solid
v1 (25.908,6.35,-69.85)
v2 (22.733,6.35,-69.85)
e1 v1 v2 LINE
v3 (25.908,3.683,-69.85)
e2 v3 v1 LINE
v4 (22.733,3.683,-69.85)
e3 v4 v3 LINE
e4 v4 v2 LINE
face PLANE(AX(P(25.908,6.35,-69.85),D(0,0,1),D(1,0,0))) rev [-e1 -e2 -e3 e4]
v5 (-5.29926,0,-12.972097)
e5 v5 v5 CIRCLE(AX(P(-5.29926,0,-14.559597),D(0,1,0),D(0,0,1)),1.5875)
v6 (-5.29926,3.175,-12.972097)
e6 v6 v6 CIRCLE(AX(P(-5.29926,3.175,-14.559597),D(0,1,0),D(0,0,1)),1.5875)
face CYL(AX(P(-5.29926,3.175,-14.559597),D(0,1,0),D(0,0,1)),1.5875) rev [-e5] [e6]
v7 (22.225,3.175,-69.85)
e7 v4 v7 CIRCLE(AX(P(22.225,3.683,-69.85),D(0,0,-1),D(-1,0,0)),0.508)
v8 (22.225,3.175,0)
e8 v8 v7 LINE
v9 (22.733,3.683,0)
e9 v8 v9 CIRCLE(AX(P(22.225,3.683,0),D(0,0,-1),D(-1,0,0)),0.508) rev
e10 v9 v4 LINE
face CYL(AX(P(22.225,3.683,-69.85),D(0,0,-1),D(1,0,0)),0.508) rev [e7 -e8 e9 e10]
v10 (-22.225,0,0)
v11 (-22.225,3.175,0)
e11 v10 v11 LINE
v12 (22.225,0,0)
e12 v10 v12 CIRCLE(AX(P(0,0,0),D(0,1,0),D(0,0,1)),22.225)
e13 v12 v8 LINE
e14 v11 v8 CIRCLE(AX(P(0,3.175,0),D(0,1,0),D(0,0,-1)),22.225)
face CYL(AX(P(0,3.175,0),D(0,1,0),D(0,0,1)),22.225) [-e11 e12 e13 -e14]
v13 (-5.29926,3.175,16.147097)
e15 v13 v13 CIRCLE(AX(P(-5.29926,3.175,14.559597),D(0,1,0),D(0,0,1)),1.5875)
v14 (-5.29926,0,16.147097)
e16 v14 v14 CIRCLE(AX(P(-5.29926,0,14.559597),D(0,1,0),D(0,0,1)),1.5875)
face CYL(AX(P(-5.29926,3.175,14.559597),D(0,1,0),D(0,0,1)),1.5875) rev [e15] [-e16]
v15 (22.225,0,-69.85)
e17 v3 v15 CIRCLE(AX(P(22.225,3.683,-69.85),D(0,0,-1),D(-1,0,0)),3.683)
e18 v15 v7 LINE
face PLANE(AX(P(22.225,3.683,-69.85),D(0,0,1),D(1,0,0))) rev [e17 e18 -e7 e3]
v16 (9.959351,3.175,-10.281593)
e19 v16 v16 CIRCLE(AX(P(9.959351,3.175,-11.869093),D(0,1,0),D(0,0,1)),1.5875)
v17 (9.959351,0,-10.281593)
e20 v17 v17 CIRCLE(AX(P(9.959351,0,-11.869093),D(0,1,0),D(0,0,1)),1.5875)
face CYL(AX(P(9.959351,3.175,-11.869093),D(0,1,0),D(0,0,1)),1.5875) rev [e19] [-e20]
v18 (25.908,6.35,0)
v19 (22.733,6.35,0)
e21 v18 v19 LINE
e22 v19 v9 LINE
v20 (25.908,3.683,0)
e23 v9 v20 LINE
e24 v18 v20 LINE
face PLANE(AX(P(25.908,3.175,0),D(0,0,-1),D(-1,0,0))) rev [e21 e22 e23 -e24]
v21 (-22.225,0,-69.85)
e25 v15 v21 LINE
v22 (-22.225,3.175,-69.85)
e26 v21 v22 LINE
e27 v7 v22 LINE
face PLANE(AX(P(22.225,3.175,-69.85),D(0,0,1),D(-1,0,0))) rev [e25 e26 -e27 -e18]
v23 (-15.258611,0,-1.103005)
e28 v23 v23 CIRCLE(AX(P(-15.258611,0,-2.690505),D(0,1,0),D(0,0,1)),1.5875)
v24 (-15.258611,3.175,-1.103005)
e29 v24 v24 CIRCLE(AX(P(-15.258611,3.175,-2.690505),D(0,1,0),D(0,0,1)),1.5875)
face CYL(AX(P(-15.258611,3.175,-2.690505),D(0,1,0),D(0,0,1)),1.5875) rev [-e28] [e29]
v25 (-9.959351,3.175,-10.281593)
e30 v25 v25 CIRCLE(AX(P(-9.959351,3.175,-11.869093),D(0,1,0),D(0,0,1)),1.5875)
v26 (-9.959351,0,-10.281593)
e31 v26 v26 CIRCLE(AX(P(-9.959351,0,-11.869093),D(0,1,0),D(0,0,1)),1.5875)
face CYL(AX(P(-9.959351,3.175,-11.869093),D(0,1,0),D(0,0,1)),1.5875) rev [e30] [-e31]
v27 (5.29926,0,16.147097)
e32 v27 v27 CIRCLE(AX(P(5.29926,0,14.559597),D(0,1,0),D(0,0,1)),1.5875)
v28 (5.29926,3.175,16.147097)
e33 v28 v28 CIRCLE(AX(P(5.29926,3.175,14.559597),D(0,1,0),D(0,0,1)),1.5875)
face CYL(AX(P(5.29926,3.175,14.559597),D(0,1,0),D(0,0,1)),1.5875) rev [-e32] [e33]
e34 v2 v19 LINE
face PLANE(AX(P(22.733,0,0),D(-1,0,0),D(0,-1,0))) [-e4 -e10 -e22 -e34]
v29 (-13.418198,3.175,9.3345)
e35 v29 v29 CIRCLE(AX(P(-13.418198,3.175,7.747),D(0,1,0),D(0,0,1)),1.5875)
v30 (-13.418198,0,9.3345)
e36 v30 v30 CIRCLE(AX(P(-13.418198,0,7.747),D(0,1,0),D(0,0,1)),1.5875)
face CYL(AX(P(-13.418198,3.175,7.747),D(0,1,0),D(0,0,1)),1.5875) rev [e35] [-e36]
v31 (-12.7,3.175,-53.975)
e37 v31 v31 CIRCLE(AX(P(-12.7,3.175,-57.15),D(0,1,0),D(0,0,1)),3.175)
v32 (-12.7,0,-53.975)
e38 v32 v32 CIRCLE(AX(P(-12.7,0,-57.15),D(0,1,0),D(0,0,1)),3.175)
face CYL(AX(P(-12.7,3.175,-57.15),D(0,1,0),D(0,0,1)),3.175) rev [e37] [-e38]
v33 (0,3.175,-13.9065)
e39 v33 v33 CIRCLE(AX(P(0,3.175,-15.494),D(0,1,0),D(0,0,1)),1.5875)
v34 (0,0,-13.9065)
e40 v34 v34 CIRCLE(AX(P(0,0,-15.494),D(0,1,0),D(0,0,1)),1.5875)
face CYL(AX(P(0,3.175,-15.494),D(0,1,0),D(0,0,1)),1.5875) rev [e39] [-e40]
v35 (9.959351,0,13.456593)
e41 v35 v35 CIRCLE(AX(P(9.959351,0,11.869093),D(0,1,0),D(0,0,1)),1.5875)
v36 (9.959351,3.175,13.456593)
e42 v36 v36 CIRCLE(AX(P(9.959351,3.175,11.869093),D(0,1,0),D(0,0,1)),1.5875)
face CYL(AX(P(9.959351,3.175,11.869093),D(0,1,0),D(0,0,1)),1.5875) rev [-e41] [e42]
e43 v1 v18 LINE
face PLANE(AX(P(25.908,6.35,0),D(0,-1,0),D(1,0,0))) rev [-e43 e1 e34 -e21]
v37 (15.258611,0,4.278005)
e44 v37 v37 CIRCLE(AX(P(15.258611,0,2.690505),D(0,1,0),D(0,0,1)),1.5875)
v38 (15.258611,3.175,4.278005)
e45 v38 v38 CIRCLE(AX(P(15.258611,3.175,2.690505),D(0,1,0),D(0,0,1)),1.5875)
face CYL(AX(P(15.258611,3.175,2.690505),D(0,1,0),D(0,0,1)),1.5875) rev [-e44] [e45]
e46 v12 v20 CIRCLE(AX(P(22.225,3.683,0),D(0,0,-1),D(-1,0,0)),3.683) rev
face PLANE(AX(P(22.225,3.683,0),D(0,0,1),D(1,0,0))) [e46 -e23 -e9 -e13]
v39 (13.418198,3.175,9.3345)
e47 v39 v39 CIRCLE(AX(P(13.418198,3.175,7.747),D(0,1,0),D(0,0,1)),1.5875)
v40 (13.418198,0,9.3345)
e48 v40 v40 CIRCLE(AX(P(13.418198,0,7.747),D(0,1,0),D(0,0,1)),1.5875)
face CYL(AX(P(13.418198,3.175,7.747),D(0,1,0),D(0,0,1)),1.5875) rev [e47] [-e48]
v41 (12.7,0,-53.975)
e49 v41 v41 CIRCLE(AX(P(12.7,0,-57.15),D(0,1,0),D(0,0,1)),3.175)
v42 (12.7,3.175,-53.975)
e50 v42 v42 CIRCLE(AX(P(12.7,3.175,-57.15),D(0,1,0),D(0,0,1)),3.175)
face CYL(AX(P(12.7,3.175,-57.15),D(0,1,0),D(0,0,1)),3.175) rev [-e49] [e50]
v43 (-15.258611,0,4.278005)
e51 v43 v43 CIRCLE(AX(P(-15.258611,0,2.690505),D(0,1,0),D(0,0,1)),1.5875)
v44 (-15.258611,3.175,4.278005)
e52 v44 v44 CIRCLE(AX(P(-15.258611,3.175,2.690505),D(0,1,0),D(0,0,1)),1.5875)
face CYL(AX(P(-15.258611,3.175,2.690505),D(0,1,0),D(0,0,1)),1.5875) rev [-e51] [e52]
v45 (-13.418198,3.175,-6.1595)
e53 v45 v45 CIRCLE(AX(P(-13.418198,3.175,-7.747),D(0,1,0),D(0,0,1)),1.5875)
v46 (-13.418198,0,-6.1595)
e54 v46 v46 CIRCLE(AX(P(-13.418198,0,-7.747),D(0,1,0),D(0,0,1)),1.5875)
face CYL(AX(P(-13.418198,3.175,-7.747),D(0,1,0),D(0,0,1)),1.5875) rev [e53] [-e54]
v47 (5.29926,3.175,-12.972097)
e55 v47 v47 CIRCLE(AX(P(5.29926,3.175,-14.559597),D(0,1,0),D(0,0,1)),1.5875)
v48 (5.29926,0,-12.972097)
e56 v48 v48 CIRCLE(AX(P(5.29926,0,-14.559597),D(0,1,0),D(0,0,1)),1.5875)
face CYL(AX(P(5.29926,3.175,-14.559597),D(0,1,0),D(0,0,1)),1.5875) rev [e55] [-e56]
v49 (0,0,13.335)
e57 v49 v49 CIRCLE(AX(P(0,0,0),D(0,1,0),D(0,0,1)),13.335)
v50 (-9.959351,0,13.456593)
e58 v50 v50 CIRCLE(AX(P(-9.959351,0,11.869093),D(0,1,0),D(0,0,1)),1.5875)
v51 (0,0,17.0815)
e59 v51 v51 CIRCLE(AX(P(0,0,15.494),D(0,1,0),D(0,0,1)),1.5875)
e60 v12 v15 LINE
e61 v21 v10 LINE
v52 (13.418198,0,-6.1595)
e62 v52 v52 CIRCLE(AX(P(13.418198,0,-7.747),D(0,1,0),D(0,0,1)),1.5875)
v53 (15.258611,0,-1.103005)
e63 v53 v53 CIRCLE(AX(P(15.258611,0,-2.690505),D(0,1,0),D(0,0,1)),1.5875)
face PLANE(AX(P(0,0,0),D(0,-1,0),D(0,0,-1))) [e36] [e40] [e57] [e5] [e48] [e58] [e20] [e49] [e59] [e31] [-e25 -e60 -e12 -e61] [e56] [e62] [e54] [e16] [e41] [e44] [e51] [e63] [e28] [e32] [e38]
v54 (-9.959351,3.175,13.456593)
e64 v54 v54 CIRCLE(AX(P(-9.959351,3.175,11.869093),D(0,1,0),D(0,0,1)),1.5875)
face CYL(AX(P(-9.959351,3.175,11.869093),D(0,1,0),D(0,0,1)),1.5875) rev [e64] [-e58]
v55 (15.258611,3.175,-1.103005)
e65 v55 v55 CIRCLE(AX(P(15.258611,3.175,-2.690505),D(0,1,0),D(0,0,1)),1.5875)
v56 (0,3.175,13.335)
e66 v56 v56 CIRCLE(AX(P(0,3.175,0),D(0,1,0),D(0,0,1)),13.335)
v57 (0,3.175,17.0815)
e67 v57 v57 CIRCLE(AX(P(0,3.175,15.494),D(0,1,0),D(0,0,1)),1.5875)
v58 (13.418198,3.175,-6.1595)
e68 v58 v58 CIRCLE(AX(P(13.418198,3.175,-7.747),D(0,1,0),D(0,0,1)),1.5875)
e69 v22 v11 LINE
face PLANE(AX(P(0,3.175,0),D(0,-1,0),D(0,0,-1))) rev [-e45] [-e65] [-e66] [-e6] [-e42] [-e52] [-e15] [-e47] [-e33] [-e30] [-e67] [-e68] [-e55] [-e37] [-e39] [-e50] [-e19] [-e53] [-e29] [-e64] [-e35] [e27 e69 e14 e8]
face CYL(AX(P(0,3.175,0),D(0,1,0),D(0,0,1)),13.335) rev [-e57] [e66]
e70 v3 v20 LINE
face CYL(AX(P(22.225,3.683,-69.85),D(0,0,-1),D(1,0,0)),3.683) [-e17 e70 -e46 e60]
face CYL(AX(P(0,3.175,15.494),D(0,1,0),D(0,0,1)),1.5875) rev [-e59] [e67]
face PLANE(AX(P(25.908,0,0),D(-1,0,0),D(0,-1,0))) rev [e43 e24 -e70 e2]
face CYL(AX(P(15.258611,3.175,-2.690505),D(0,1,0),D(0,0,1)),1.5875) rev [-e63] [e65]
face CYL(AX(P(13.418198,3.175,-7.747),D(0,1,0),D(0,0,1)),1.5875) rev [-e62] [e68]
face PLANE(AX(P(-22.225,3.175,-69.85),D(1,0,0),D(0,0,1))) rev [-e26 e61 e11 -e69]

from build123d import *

# Parameters (mm, degrees)
SKETCH1_R           = 13.335
BOSS_EXTRUDE1_DEPTH = 3.175
SKETCH2_R           = 3.175
SKETCH2_R_2         = 1.5875
CUT_EXTRUDE1_DEPTH  = 74.369297053
EDGE_FLANGE2_DEPTH  = 69.85


# Sheet-metal steps are written as plain solids
with BuildPart() as part:
    # Sketch1 → Boss-Extrude1 (new body)
    with BuildSketch(Plane(origin=(0, 0, 0), x_dir=(1, 0, 0), z_dir=(0, 1, 0))):
        with BuildLine():
            Line((22.225, 0), (22.225, 69.85))
            Line((22.225, 69.85), (-22.225, 69.85))
            Line((-22.225, 69.85), (-22.225, 0))
            ThreePointArc((-22.225, 0), (0, -22.225), (22.225, 0))
        make_face()
        with Locations(Location((0, 0, 0), (0, 0, 270))):
            Circle(SKETCH1_R, mode=Mode.SUBTRACT)
    extrude(amount=BOSS_EXTRUDE1_DEPTH)

    # Sketch2 → Cut-Extrude1 (cut, through all)
    with BuildSketch(Plane(origin=(0, 3.175, 0), x_dir=(1, 0, 0), z_dir=(0, 1, 0))):
        with Locations(Location((-12.7, 57.15, 0), (0, 0, 270))):
            Circle(SKETCH2_R)
        with Locations(Location((12.7, 57.15, 0), (0, 0, 270))):
            Circle(SKETCH2_R)
        with Locations(Location((0, 15.494, 0), (0, 0, 270))):
            Circle(SKETCH2_R_2)
        with Locations(Location((5.299260101, 14.559597466, 0), (0, 0, 270))):
            Circle(SKETCH2_R_2)
        with Locations(Location((9.959351224, 11.869092602, 0), (0, 0, 270))):
            Circle(SKETCH2_R_2)
        with Locations(Location((13.418197606, 7.747, 0), (0, 0, 270))):
            Circle(SKETCH2_R_2)
        with Locations(Location((15.258611325, 2.690504865, 0), (0, 0, 270))):
            Circle(SKETCH2_R_2)
        with Locations(Location((15.258611325, -2.690504865, 0), (0, 0, 270))):
            Circle(SKETCH2_R_2)
        with Locations(Location((13.418197606, -7.747, 0), (0, 0, 270))):
            Circle(SKETCH2_R_2)
        with Locations(Location((9.959351224, -11.869092602, 0), (0, 0, 270))):
            Circle(SKETCH2_R_2)
        with Locations(Location((5.299260101, -14.559597466, 0), (0, 0, 270))):
            Circle(SKETCH2_R_2)
        with Locations(Location((0, -15.494, 0), (0, 0, 270))):
            Circle(SKETCH2_R_2)
        with Locations(Location((-5.299260101, -14.559597466, 0), (0, 0, 270))):
            Circle(SKETCH2_R_2)
        with Locations(Location((-9.959351224, -11.869092602, 0), (0, 0, 270))):
            Circle(SKETCH2_R_2)
        with Locations(Location((-13.418197606, -7.747, 0), (0, 0, 270))):
            Circle(SKETCH2_R_2)
        with Locations(Location((-15.258611325, -2.690504865, 0), (0, 0, 270))):
            Circle(SKETCH2_R_2)
        with Locations(Location((-15.258611325, 2.690504865, 0), (0, 0, 270))):
            Circle(SKETCH2_R_2)
        with Locations(Location((-13.418197606, 7.747, 0), (0, 0, 270))):
            Circle(SKETCH2_R_2)
        with Locations(Location((-9.959351224, 11.869092602, 0), (0, 0, 270))):
            Circle(SKETCH2_R_2)
        with Locations(Location((-5.299260101, 14.559597466, 0), (0, 0, 270))):
            Circle(SKETCH2_R_2)
    extrude(amount=-CUT_EXTRUDE1_DEPTH, mode=Mode.SUBTRACT)

    # Edge-Flange2 section (across the edge) → Edge-Flange2 (add)
    with BuildSketch(Plane(origin=(22.733, 3.175, 0), x_dir=(-1, 0, 0), z_dir=(0, 0, -1))):
        with BuildLine():
            Line((-3.175, 0.508), (-3.175, 3.175))
            Line((-3.175, 3.175), (0, 3.175))
            Line((0, 3.175), (0, 0.508))
            ThreePointArc((0, 0.508), (0.148789755, 0.148789755), (0.508, 0))
            Line((0.508, 0), (0.508, -3.175))
            ThreePointArc((0.508, -3.175), (-2.096274275, -2.096274275), (-3.175, 0.508))
        make_face()
    extrude(amount=EDGE_FLANGE2_DEPTH)


solid = part.part
